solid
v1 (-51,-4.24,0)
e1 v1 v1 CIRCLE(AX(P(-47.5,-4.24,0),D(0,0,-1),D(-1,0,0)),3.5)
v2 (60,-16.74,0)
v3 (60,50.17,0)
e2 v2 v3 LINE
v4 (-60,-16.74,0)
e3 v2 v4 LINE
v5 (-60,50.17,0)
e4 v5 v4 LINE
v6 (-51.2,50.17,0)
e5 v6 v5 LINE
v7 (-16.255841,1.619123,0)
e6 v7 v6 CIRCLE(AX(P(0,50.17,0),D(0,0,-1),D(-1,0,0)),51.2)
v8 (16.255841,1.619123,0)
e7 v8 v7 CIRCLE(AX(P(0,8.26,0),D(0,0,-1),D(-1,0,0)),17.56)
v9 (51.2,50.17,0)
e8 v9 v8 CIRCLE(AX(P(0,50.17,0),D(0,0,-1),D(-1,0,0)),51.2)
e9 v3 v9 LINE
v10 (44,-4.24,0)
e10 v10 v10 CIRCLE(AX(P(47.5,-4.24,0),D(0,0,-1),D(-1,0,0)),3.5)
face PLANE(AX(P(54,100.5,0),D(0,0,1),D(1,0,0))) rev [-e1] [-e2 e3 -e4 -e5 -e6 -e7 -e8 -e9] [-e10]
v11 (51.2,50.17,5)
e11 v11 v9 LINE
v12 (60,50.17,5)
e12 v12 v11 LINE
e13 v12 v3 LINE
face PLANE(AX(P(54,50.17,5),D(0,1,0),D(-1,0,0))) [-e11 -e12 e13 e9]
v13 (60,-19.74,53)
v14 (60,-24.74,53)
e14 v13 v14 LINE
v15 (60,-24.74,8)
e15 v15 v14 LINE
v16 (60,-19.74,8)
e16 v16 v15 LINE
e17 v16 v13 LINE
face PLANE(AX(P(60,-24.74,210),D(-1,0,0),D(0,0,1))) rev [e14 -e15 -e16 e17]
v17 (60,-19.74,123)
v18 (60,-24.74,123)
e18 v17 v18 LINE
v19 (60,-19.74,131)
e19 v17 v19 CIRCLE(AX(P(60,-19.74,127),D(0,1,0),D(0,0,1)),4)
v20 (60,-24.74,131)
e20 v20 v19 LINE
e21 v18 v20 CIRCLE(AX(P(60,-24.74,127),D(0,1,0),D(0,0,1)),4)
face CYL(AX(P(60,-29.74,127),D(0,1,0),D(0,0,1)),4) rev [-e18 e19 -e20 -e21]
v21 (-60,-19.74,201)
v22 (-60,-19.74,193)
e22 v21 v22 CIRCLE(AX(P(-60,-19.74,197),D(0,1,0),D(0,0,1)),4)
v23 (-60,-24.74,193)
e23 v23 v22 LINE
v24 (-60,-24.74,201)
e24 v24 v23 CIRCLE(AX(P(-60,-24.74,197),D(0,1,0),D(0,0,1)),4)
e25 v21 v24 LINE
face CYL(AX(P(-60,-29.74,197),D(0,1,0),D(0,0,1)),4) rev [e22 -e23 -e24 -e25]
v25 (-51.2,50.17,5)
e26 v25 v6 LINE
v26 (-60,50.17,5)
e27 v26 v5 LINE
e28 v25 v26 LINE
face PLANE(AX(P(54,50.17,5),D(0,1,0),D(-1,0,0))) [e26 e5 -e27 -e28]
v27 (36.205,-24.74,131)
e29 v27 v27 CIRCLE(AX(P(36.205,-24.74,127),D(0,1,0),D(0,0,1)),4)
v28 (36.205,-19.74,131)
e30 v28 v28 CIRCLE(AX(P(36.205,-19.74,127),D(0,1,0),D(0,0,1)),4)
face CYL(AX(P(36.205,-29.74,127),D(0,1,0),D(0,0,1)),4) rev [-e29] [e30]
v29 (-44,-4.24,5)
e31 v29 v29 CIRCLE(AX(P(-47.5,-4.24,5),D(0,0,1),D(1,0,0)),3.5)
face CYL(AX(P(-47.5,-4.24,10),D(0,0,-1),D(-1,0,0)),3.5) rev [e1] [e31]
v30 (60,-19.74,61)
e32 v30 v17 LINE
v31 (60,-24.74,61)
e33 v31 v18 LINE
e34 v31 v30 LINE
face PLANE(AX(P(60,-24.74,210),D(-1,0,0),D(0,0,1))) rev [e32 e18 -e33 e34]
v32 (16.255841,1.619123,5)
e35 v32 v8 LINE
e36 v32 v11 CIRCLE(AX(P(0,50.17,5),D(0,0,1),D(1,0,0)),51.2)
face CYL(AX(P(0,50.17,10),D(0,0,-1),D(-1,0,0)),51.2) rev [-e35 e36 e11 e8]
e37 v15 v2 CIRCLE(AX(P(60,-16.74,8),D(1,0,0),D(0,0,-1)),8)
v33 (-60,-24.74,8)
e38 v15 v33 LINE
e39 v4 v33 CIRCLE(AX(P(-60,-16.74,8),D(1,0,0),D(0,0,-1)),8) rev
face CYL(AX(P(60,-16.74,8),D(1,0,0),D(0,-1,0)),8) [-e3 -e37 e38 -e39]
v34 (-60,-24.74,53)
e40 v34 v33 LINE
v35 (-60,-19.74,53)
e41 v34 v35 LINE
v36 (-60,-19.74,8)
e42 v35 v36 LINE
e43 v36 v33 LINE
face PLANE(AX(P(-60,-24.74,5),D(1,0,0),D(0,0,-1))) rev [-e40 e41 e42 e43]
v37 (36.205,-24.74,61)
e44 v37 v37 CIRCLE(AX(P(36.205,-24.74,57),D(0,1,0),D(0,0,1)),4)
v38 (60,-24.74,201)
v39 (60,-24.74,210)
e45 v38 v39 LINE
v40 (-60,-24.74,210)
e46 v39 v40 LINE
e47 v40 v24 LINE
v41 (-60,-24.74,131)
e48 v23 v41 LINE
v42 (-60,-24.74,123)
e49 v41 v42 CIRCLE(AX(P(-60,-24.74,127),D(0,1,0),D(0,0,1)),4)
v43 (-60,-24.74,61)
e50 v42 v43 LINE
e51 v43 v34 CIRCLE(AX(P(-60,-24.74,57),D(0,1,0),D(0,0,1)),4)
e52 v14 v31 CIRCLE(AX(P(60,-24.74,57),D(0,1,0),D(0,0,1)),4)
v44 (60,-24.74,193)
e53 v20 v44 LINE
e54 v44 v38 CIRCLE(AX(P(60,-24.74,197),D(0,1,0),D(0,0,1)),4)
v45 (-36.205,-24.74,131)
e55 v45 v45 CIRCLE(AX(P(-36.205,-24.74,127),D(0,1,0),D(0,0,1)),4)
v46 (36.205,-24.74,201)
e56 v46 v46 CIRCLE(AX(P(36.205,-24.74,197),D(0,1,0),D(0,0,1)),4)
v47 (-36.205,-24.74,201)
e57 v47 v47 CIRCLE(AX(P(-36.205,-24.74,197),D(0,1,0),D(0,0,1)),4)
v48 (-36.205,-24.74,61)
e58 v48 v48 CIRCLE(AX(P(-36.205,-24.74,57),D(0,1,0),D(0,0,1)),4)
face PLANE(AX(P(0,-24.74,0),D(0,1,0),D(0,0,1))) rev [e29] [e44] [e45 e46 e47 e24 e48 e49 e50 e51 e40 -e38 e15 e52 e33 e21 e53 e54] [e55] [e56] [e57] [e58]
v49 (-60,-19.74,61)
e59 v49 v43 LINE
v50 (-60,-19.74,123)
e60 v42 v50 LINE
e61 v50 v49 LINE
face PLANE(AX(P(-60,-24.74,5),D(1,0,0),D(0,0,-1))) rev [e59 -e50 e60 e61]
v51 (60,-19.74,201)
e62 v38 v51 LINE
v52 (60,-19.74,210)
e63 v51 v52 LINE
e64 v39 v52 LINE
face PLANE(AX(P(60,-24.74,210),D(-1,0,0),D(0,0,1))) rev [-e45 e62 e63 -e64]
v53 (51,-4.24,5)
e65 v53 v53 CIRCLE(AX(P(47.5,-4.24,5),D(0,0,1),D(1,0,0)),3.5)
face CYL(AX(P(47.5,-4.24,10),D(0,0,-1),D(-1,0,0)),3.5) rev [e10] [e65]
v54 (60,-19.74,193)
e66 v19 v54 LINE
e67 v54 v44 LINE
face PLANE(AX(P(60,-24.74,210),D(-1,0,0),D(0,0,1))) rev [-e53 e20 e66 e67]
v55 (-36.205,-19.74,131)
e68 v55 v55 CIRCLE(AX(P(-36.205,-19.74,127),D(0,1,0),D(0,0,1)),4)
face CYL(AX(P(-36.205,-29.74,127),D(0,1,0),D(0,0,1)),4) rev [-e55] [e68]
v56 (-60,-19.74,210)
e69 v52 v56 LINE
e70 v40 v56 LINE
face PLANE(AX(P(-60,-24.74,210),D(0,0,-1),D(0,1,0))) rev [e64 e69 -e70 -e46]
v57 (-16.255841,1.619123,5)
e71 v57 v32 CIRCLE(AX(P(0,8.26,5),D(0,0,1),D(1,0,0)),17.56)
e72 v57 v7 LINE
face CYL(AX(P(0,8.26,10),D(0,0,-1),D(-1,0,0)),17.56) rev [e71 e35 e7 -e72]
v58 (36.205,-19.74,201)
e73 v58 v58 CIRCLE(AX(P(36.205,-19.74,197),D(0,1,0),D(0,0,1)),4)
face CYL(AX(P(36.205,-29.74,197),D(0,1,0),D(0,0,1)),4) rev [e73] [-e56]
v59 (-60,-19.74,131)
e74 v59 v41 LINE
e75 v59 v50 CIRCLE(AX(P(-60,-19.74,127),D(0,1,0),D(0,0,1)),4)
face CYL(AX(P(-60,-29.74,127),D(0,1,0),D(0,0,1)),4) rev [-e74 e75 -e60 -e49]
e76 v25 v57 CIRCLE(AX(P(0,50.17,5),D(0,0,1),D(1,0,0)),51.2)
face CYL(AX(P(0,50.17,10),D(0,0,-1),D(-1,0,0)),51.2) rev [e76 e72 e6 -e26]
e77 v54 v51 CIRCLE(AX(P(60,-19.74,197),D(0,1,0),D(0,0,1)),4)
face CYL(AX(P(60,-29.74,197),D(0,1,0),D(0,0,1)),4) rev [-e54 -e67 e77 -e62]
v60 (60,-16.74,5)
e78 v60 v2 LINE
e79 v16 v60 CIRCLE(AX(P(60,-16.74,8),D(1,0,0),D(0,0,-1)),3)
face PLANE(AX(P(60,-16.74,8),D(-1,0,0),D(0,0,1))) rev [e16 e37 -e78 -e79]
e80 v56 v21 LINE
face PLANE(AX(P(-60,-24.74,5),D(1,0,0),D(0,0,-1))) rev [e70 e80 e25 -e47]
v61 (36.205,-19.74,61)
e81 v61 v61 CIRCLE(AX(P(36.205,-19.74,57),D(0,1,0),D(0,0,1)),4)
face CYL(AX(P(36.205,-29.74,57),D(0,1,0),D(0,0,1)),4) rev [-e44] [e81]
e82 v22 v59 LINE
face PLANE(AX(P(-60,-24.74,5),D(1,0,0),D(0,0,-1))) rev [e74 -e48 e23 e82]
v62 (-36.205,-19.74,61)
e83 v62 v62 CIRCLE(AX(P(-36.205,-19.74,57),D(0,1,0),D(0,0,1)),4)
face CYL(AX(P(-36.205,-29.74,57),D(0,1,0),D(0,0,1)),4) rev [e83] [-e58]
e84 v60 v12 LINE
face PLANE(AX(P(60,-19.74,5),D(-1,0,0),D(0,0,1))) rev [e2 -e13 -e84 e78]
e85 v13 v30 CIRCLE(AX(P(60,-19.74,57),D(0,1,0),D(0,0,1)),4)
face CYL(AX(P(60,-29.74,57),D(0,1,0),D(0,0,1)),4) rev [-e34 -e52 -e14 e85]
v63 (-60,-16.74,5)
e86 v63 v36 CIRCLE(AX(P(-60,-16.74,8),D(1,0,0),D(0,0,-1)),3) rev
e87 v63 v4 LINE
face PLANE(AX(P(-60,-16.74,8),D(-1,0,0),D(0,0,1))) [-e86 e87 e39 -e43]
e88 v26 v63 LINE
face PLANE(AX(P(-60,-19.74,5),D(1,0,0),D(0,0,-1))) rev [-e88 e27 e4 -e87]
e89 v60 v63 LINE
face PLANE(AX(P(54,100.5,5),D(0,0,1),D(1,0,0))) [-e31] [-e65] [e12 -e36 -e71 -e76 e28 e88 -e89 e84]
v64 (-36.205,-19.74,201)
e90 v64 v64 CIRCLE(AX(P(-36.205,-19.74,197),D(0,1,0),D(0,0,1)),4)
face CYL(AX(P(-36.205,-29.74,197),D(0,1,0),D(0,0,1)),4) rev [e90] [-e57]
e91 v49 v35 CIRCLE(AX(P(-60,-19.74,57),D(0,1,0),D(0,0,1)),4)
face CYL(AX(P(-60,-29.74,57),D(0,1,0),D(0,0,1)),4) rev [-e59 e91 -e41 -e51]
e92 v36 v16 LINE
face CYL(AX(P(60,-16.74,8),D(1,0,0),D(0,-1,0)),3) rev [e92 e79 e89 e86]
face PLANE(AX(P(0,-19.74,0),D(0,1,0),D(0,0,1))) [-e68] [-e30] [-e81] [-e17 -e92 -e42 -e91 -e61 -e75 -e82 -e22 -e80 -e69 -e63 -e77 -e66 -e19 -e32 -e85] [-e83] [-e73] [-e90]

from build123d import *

# Parameters (mm, degrees)
BASE_FLANGE2_DEPTH           = 5
EDGE_FLANGE3_STRIP_W         = 26
EDGE_FLANGE3_STRIP_H         = 5
EDGE_FLANGE3_STRIP_CUT_DEPTH = 120
EDGE_FLANGE3_DEPTH           = 120
SKETCH18_R                   = 3
CUT_EXTRUDE7_DEPTH           = 10
SKETCH22_R                   = 4
CUT_EXTRUDE11_DEPTH          = 10
SKETCH25_R                   = 3.5
CUT_EXTRUDE14_DEPTH          = 10
CUT_EXTRUDE17_DEPTH          = 243.986110714
CUT_EXTRUDE17_DEPTH_BACK     = 243.986110714
SKETCH26_R                   = 3


# Sheet-metal steps are written as plain solids
with BuildPart() as part:
    # Sketch1 → Base-Flange2 (new body)
    with BuildSketch(Plane.XY):
        with BuildLine():
            Line((60, -19.74), (60, 100.5))
            ThreePointArc((60, 100.5), (58.242640687, 104.742640687), (54, 106.5))
            Line((54, 106.5), (-54, 106.5))
            ThreePointArc((-54, 106.5), (-58.242640687, 104.742640687), (-60, 100.5))
            Line((-60, 100.5), (-60, -19.74))
            Line((-60, -19.74), (60, -19.74))
        make_face()
    extrude(amount=BASE_FLANGE2_DEPTH)

    # Edge-Flange3 strip (across the edge) → Edge-Flange3 strip cut (cut)
    with BuildSketch(Plane(origin=(-60, -19.74, 5), x_dir=(0, 1, 0), z_dir=(1, 0, 0))):
        with Locations((-10, -2.5)):
            Rectangle(EDGE_FLANGE3_STRIP_W, EDGE_FLANGE3_STRIP_H)
    extrude(amount=EDGE_FLANGE3_STRIP_CUT_DEPTH, mode=Mode.SUBTRACT)

    # Edge-Flange3 section (across the edge) → Edge-Flange3 (add)
    with BuildSketch(Plane(origin=(-60, -19.74, 5), x_dir=(0, 1, 0), z_dir=(1, 0, 0))):
        with BuildLine():
            Line((-5, 3), (-5, 205))
            Line((-5, 205), (0, 205))
            Line((0, 205), (0, 3))
            ThreePointArc((0, 3), (0.878679656, 0.878679656), (3, 0))
            Line((3, 0), (3, -5))
            ThreePointArc((3, -5), (-2.656854249, -2.656854249), (-5, 3))
        make_face()
    extrude(amount=EDGE_FLANGE3_DEPTH)

    # Sketch18 → Cut-Extrude7 (cut)
    with BuildSketch(Plane.XY.offset(5)):
        with Locations((-50, 96.5)):
            Circle(SKETCH18_R)
        with Locations((50, 96.5)):
            Circle(SKETCH18_R)
    extrude(amount=-CUT_EXTRUDE7_DEPTH, mode=Mode.SUBTRACT)

    # Sketch22 → Cut-Extrude11 (cut)
    with BuildSketch(Plane(origin=(0, -19.74, 0), x_dir=(1, 0, 0), z_dir=(0, 1, 0))):
        with Locations(Location((36.205, -197, 0), (0, 0, 270))):
            Circle(SKETCH22_R)
        with Locations(Location((-36.205, -197, 0), (0, 0, 270))):
            Circle(SKETCH22_R)
        with Locations(Location((-36.205, -127, 0), (0, 0, 270))):
            Circle(SKETCH22_R)
        with Locations(Location((36.205, -127, 0), (0, 0, 270))):
            Circle(SKETCH22_R)
        with Locations(Location((36.205, -57, 0), (0, 0, 270))):
            Circle(SKETCH22_R)
        with Locations(Location((-36.205, -57, 0), (0, 0, 270))):
            Circle(SKETCH22_R)
        with Locations((60, -197)):
            Circle(SKETCH22_R)
        with Locations((60, -127)):
            Circle(SKETCH22_R)
        with Locations((-60, -197)):
            Circle(SKETCH22_R)
        with Locations((-60, -127)):
            Circle(SKETCH22_R)
        with Locations((-60, -57)):
            Circle(SKETCH22_R)
        with Locations((60, -57)):
            Circle(SKETCH22_R)
    extrude(amount=-CUT_EXTRUDE11_DEPTH, mode=Mode.SUBTRACT)

    # Sketch25 → Cut-Extrude14 (cut)
    with BuildSketch(Plane(origin=(0, 0, 0), x_dir=(-1, 0, 0), z_dir=(0, 0, -1))):
        with Locations((-47.5, -4.24)):
            Circle(SKETCH25_R)
        with Locations((47.5, -4.24)):
            Circle(SKETCH25_R)
        with BuildLine():
            ThreePointArc((16.25584062, 1.619123121), (0, 101.37), (-16.25584062, 1.619123121))
            ThreePointArc((-16.25584062, 1.619123121), (0, -9.3), (16.25584062, 1.619123121))
        make_face()
    extrude(amount=-CUT_EXTRUDE14_DEPTH, mode=Mode.SUBTRACT)

    # Sketch26 → Cut-Extrude17 (cut, two sides: drawn at the far end of the back side and taken through both)
    with BuildSketch(Plane(origin=(0, 0, 0), x_dir=(-1, 0, 0), z_dir=(0, 0, -1)).offset(-CUT_EXTRUDE17_DEPTH_BACK)):
        with BuildLine():
            Line((-60, 50.17), (-51.2, 50.17))
            ThreePointArc((-51.2, 50.17), (0, 101.37), (51.2, 50.17))
            Line((51.2, 50.17), (60, 50.17))
            Line((60, 50.17), (60, 100.5))
            ThreePointArc((60, 100.5), (58.242640687, 104.742640687), (54, 106.5))
            Line((54, 106.5), (-54, 106.5))
            ThreePointArc((-54, 106.5), (-58.242640687, 104.742640687), (-60, 100.5))
            Line((-60, 100.5), (-60, 50.17))
        make_face()
        with Locations((-50, 96.5)):
            Circle(SKETCH26_R, mode=Mode.SUBTRACT)
        with Locations((50, 96.5)):
            Circle(SKETCH26_R, mode=Mode.SUBTRACT)
    extrude(amount=CUT_EXTRUDE17_DEPTH + CUT_EXTRUDE17_DEPTH_BACK, mode=Mode.SUBTRACT)


solid = part.part
